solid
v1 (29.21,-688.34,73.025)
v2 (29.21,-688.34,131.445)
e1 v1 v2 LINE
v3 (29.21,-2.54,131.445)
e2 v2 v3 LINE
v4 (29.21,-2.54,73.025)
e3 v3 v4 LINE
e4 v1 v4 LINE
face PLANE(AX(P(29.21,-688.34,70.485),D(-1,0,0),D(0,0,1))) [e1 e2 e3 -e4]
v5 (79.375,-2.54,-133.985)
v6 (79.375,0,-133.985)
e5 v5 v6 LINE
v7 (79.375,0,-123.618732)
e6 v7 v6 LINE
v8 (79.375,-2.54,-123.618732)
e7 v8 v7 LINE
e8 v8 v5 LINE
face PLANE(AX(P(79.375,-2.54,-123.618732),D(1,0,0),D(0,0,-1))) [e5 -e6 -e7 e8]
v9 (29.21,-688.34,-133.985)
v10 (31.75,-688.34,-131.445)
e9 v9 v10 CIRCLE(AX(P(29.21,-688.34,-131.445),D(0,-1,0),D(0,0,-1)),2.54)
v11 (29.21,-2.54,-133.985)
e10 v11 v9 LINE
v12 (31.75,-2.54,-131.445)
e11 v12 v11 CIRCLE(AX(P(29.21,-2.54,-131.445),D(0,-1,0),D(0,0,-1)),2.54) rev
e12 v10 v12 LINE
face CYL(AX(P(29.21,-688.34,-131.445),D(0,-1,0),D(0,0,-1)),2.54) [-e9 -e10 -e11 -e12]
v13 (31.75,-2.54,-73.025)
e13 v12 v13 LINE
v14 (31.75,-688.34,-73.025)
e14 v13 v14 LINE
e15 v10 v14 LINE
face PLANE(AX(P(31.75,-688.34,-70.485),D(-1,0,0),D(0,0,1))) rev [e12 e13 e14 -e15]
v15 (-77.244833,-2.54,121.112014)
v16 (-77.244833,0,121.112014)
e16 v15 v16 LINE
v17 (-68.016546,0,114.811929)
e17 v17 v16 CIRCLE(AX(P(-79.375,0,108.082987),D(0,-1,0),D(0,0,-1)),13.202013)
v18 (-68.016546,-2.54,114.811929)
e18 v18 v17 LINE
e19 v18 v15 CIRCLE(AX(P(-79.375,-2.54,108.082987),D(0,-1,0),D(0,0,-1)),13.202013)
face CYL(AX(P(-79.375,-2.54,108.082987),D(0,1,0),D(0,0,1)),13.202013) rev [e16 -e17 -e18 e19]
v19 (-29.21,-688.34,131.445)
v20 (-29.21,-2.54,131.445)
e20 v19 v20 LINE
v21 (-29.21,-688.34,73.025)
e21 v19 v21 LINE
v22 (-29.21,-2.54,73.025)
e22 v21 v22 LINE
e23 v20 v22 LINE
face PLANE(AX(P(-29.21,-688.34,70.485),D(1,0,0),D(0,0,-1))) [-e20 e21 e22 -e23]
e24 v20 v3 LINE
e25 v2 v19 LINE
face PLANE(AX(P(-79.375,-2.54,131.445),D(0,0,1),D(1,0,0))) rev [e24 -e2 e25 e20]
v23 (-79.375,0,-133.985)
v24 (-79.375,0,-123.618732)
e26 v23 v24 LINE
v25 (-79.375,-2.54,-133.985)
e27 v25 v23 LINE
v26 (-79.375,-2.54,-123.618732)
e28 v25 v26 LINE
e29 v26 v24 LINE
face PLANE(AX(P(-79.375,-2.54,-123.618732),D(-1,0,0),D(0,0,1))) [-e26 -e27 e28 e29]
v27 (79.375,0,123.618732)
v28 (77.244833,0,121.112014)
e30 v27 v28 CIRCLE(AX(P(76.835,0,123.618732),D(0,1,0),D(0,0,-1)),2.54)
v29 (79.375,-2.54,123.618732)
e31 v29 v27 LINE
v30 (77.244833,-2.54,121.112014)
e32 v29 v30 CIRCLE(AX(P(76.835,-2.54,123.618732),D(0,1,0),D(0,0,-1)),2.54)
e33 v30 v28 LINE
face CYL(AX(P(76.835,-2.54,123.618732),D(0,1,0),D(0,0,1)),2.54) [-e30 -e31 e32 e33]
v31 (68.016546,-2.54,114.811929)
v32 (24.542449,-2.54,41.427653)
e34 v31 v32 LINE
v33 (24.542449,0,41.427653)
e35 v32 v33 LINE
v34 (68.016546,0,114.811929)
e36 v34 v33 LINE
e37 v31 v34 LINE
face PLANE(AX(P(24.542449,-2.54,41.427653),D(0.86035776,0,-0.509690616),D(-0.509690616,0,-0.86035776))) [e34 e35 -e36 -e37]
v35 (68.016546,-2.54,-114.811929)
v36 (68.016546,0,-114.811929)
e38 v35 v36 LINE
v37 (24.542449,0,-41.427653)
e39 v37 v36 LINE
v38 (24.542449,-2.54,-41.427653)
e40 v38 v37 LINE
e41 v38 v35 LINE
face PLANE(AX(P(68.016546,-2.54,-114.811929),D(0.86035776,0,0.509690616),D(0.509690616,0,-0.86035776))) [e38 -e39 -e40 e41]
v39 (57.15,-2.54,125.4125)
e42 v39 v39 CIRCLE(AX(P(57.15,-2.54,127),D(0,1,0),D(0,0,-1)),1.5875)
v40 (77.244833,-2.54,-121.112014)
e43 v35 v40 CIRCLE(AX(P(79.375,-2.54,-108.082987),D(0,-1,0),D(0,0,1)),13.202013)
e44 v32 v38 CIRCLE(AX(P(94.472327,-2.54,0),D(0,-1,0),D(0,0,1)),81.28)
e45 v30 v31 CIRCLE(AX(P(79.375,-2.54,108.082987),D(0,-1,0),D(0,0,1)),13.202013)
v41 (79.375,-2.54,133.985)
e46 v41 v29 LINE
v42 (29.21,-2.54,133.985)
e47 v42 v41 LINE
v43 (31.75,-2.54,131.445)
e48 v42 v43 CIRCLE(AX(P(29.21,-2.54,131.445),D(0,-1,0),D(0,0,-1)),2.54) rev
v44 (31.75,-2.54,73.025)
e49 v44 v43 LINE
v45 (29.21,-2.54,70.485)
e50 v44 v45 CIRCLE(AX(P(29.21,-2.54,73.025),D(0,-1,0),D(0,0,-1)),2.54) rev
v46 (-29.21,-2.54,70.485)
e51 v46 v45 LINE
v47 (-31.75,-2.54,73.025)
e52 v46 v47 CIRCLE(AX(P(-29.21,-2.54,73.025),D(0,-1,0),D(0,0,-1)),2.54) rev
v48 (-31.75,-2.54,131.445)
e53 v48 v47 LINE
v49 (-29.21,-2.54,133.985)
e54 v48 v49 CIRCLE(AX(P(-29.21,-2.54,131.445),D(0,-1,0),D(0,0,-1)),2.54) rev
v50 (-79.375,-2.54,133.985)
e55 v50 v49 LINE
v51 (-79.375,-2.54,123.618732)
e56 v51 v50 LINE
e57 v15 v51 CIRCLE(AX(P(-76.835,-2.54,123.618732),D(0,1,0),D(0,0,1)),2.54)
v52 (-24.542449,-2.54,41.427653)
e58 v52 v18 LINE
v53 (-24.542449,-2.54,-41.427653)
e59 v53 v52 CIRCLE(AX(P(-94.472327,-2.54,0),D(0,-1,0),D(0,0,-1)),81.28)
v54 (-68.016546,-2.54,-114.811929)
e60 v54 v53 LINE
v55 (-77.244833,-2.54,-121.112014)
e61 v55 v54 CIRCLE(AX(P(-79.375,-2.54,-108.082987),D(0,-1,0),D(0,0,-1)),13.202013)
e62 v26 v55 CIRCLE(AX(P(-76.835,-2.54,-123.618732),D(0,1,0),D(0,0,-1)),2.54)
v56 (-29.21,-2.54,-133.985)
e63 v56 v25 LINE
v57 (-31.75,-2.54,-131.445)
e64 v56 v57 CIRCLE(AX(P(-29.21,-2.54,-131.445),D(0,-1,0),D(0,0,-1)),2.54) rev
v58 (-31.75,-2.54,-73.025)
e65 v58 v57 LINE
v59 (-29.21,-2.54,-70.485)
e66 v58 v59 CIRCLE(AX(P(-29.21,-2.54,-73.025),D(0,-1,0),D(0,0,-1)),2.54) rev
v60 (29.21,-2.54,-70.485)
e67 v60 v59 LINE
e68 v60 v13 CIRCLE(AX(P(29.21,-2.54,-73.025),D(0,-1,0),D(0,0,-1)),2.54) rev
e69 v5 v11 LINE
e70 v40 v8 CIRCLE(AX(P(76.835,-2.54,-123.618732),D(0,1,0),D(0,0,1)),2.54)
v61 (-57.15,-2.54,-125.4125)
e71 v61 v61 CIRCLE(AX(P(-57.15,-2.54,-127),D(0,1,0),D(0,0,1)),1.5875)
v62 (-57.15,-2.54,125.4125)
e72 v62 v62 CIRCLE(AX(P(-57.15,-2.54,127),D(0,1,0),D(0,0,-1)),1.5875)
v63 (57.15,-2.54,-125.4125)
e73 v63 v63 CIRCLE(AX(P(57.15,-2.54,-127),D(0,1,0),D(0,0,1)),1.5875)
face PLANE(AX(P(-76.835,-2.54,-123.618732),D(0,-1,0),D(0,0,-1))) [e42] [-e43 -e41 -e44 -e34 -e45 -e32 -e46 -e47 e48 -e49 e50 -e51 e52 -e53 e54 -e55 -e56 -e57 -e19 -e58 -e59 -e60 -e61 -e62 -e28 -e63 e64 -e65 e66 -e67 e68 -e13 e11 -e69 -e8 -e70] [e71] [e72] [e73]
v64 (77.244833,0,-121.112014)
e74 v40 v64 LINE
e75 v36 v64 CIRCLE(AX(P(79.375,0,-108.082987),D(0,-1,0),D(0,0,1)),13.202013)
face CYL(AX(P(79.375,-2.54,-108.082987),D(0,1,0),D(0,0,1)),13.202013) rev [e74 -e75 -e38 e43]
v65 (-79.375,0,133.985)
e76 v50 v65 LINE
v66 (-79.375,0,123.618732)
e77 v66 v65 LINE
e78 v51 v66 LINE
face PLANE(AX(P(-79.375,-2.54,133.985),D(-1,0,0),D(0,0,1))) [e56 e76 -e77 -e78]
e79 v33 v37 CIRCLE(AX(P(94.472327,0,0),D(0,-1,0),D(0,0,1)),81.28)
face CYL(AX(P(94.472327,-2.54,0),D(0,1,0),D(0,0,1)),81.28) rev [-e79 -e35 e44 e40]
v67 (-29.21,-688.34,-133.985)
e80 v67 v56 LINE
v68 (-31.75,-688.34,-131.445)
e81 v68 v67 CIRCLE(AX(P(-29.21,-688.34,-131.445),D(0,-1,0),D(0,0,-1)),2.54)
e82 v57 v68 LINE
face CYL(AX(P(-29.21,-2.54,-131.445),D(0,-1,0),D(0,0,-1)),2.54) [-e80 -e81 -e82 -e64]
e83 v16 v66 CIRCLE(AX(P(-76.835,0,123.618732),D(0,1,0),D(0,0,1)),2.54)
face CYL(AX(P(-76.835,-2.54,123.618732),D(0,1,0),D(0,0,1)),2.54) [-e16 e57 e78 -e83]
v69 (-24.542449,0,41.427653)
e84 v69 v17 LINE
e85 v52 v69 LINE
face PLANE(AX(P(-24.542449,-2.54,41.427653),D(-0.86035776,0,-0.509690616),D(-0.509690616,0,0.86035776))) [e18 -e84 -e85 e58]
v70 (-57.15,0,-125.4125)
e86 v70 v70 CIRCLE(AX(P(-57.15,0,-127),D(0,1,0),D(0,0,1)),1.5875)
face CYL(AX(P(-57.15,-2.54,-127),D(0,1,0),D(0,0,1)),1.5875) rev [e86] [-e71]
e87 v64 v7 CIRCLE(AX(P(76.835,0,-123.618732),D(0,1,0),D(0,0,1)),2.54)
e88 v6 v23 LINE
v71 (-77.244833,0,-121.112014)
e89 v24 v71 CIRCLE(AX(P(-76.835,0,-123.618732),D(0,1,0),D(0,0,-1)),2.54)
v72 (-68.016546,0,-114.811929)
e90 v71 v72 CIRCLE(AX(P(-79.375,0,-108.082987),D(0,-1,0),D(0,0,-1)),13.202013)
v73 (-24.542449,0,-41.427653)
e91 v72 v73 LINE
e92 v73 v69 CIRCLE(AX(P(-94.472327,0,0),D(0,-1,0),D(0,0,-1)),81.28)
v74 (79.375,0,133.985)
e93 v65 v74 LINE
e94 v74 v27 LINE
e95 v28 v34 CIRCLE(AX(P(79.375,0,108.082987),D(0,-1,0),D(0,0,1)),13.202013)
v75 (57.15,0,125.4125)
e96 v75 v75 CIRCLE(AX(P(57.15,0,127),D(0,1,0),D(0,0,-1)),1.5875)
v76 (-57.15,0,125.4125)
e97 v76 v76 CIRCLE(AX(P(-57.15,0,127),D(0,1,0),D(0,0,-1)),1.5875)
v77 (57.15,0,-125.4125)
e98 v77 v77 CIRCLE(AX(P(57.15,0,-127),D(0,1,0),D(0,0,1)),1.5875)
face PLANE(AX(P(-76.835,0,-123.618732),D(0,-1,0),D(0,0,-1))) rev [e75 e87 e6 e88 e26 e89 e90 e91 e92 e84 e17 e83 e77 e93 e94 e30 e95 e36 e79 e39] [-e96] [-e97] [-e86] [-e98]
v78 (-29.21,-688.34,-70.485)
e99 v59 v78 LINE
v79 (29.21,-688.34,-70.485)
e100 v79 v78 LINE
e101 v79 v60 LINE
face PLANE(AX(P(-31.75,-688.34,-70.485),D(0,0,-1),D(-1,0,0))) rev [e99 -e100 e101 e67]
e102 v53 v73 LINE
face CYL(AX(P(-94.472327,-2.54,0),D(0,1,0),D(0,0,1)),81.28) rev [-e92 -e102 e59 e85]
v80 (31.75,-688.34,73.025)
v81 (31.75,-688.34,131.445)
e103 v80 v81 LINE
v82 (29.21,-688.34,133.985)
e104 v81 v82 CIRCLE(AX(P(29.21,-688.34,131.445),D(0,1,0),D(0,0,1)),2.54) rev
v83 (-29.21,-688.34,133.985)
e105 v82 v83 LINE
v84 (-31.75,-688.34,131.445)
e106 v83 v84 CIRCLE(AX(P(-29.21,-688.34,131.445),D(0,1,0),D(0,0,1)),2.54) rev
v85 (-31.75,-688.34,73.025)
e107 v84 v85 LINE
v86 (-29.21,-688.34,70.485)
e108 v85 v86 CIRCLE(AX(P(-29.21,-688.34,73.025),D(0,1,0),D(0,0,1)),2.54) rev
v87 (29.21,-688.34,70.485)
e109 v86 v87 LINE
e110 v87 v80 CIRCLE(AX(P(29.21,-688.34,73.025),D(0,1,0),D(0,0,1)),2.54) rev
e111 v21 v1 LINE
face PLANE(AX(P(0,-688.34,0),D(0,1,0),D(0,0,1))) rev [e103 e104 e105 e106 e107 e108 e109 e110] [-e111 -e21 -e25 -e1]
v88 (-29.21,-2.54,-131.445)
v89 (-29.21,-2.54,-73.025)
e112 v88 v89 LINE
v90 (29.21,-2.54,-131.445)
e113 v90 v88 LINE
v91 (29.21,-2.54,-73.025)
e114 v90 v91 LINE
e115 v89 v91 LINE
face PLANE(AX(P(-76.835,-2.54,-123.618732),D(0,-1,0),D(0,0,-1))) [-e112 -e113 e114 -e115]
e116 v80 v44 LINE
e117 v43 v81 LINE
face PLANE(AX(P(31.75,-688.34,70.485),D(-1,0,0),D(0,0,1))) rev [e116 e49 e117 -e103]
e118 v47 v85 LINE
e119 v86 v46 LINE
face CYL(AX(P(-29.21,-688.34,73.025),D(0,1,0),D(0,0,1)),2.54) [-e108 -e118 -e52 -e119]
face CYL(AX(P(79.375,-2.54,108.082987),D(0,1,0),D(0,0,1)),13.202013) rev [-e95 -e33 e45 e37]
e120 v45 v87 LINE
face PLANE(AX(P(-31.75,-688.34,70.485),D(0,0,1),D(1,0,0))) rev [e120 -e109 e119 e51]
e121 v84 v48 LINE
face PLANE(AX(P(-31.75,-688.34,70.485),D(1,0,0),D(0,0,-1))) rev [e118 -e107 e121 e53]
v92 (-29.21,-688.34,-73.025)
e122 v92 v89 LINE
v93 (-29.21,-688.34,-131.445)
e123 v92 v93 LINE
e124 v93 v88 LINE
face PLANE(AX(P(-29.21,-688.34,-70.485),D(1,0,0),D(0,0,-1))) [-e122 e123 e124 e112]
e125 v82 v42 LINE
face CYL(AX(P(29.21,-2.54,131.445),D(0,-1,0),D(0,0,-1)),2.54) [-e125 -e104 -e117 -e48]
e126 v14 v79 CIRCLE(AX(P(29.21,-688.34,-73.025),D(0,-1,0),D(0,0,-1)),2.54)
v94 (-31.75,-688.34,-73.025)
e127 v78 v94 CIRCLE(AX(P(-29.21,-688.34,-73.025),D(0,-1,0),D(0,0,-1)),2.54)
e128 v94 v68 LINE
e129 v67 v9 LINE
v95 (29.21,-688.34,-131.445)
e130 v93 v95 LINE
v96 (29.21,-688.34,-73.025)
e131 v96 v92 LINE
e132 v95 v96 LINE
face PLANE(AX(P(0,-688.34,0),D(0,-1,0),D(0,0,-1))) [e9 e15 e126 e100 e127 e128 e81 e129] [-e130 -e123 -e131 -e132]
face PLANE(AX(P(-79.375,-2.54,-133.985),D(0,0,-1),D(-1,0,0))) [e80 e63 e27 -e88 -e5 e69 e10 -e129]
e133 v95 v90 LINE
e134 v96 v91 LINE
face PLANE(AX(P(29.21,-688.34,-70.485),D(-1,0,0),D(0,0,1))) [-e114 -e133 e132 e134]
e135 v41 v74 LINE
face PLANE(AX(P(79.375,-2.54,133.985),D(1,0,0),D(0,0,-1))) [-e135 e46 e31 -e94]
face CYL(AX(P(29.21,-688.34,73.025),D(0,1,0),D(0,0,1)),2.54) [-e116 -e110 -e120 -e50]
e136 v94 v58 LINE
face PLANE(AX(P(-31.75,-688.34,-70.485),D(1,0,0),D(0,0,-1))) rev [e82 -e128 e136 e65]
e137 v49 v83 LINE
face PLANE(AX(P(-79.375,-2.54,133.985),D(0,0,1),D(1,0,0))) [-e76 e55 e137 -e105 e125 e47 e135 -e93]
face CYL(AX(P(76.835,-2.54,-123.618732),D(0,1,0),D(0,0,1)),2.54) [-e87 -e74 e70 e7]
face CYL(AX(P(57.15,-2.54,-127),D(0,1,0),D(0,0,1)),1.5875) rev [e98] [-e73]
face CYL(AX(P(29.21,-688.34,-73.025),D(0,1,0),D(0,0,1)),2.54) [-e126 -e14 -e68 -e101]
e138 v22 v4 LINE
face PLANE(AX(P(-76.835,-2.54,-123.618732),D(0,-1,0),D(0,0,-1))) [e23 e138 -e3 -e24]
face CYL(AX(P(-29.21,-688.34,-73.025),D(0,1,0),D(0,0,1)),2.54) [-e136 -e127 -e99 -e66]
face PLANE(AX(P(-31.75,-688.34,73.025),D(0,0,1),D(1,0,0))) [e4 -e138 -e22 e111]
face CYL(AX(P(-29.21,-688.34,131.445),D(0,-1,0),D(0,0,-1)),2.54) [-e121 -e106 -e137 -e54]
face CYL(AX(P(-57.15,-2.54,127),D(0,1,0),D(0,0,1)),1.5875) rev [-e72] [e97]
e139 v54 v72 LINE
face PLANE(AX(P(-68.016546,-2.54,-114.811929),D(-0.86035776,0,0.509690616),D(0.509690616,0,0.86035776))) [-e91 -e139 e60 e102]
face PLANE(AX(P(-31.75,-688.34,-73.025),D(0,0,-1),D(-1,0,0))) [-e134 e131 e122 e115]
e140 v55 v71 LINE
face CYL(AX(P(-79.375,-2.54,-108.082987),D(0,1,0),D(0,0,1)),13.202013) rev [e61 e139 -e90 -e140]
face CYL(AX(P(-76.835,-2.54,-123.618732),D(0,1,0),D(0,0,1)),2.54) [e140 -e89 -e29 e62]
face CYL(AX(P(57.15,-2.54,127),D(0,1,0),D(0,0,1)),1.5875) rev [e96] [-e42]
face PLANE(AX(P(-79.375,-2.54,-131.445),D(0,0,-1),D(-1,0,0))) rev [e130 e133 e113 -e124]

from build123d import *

# Parameters (mm, degrees)
SKETCH1_R           = 1.5875
BOSS_EXTRUDE1_DEPTH = 2.54
SKETCH2_W           = 63.5
SKETCH2_H           = 63.5
BOSS_EXTRUDE2_DEPTH = 685.8
SHELL1_START        = -688.34
SHELL1_OUTLINE_W    = 58.42
SHELL1_OUTLINE_H    = 58.42
SHELL1_DEPTH        = 685.8
FILLET1_R           = 2.54
FILLET2_R           = 2.54


# Read off the part's stored shape, not the designer's step: Shell1
with BuildPart() as part:
    # Sketch1 → Boss-Extrude1 (new body)
    with BuildSketch(Plane(origin=(0, 0, 0), x_dir=(1, 0, 0), z_dir=(0, 1, 0))):
        with BuildLine():
            Line((-79.375, -133.985), (79.375, -133.985))
            Line((79.375, -133.985), (79.375, -123.618732018))
            ThreePointArc((79.375, -123.618732018), (78.770533054, -121.973948811), (77.244833229, -121.1120137))
            ThreePointArc((77.244833229, -121.1120137), (71.931312021, -118.98641106), (68.016545719, -114.811929173))
            Line((68.016545719, -114.811929173), (24.542448632, -41.427653291))
            ThreePointArc((24.542448632, -41.427653291), (13.192327388, 0), (24.542448632, 41.427653291))
            Line((24.542448632, 41.427653291), (68.016545719, 114.811929173))
            ThreePointArc((68.016545719, 114.811929173), (71.931312021, 118.98641106), (77.244833229, 121.1120137))
            ThreePointArc((77.244833229, 121.1120137), (78.770533054, 121.973948811), (79.375, 123.618732018))
            Line((79.375, 123.618732018), (79.375, 133.985))
            Line((79.375, 133.985), (-79.375, 133.985))
            Line((-79.375, 133.985), (-79.375, 123.618732018))
            ThreePointArc((-79.375, 123.618732018), (-78.770533054, 121.973948811), (-77.244833229, 121.1120137))
            ThreePointArc((-77.244833229, 121.1120137), (-71.931312021, 118.98641106), (-68.016545719, 114.811929173))
            Line((-68.016545719, 114.811929173), (-24.542448632, 41.427653291))
            ThreePointArc((-24.542448632, 41.427653291), (-13.192327388, 0), (-24.542448632, -41.427653291))
            Line((-24.542448632, -41.427653291), (-68.016545719, -114.811929173))
            ThreePointArc((-68.016545719, -114.811929173), (-71.931312021, -118.98641106), (-77.244833229, -121.1120137))
            ThreePointArc((-77.244833229, -121.1120137), (-78.770533054, -121.973948811), (-79.375, -123.618732018))
            Line((-79.375, -123.618732018), (-79.375, -133.985))
        make_face()
        with Locations(Location((-57.15, 127, 0), (0, 0, 270))):
            Circle(SKETCH1_R, mode=Mode.SUBTRACT)
        with Locations(Location((57.15, 127, 0), (0, 0, 270))):
            Circle(SKETCH1_R, mode=Mode.SUBTRACT)
        with Locations(Location((57.15, -127, 0), (0, 0, 90))):
            Circle(SKETCH1_R, mode=Mode.SUBTRACT)
        with Locations(Location((-57.15, -127, 0), (0, 0, 90))):
            Circle(SKETCH1_R, mode=Mode.SUBTRACT)
    extrude(amount=-BOSS_EXTRUDE1_DEPTH)

    # Sketch2 → Boss-Extrude2 (add)
    with BuildSketch(Plane.XZ.offset(2.54)):
        with Locations((0, -102.235)):
            Rectangle(SKETCH2_W, SKETCH2_H)
        with Locations((0, 102.235)):
            Rectangle(SKETCH2_W, SKETCH2_H)
    extrude(amount=BOSS_EXTRUDE2_DEPTH)

    # Shell1 outline → Shell1 (cut)
    with BuildSketch(Plane(origin=(0, 0, 0), x_dir=(1, 0, 0), z_dir=(0, 1, 0)).offset(SHELL1_START)):
        with Locations((0, 102.235)):
            Rectangle(SHELL1_OUTLINE_W, SHELL1_OUTLINE_H)
        with Locations((0, -102.235)):
            Rectangle(SHELL1_OUTLINE_W, SHELL1_OUTLINE_H)
    extrude(amount=SHELL1_DEPTH, mode=Mode.SUBTRACT)

    # Fillet1
    fillet1_edges = [part.edges().sort_by_distance(p)[0] for p in [
        (31.75, -345.44, 70.485),
        (31.75, -345.44, 133.985),
        (-31.75, -345.44, 133.985),
        (-31.75, -345.44, 70.485),
    ]]
    fillet(fillet1_edges, radius=FILLET1_R)

    # Fillet2
    fillet2_edges = [part.edges().sort_by_distance(p)[0] for p in [
        (-31.75, -345.44, -70.485),
        (-31.75, -345.44, -133.985),
        (31.75, -345.44, -133.985),
        (31.75, -345.44, -70.485),
    ]]
    fillet(fillet2_edges, radius=FILLET2_R)


solid = part.part
